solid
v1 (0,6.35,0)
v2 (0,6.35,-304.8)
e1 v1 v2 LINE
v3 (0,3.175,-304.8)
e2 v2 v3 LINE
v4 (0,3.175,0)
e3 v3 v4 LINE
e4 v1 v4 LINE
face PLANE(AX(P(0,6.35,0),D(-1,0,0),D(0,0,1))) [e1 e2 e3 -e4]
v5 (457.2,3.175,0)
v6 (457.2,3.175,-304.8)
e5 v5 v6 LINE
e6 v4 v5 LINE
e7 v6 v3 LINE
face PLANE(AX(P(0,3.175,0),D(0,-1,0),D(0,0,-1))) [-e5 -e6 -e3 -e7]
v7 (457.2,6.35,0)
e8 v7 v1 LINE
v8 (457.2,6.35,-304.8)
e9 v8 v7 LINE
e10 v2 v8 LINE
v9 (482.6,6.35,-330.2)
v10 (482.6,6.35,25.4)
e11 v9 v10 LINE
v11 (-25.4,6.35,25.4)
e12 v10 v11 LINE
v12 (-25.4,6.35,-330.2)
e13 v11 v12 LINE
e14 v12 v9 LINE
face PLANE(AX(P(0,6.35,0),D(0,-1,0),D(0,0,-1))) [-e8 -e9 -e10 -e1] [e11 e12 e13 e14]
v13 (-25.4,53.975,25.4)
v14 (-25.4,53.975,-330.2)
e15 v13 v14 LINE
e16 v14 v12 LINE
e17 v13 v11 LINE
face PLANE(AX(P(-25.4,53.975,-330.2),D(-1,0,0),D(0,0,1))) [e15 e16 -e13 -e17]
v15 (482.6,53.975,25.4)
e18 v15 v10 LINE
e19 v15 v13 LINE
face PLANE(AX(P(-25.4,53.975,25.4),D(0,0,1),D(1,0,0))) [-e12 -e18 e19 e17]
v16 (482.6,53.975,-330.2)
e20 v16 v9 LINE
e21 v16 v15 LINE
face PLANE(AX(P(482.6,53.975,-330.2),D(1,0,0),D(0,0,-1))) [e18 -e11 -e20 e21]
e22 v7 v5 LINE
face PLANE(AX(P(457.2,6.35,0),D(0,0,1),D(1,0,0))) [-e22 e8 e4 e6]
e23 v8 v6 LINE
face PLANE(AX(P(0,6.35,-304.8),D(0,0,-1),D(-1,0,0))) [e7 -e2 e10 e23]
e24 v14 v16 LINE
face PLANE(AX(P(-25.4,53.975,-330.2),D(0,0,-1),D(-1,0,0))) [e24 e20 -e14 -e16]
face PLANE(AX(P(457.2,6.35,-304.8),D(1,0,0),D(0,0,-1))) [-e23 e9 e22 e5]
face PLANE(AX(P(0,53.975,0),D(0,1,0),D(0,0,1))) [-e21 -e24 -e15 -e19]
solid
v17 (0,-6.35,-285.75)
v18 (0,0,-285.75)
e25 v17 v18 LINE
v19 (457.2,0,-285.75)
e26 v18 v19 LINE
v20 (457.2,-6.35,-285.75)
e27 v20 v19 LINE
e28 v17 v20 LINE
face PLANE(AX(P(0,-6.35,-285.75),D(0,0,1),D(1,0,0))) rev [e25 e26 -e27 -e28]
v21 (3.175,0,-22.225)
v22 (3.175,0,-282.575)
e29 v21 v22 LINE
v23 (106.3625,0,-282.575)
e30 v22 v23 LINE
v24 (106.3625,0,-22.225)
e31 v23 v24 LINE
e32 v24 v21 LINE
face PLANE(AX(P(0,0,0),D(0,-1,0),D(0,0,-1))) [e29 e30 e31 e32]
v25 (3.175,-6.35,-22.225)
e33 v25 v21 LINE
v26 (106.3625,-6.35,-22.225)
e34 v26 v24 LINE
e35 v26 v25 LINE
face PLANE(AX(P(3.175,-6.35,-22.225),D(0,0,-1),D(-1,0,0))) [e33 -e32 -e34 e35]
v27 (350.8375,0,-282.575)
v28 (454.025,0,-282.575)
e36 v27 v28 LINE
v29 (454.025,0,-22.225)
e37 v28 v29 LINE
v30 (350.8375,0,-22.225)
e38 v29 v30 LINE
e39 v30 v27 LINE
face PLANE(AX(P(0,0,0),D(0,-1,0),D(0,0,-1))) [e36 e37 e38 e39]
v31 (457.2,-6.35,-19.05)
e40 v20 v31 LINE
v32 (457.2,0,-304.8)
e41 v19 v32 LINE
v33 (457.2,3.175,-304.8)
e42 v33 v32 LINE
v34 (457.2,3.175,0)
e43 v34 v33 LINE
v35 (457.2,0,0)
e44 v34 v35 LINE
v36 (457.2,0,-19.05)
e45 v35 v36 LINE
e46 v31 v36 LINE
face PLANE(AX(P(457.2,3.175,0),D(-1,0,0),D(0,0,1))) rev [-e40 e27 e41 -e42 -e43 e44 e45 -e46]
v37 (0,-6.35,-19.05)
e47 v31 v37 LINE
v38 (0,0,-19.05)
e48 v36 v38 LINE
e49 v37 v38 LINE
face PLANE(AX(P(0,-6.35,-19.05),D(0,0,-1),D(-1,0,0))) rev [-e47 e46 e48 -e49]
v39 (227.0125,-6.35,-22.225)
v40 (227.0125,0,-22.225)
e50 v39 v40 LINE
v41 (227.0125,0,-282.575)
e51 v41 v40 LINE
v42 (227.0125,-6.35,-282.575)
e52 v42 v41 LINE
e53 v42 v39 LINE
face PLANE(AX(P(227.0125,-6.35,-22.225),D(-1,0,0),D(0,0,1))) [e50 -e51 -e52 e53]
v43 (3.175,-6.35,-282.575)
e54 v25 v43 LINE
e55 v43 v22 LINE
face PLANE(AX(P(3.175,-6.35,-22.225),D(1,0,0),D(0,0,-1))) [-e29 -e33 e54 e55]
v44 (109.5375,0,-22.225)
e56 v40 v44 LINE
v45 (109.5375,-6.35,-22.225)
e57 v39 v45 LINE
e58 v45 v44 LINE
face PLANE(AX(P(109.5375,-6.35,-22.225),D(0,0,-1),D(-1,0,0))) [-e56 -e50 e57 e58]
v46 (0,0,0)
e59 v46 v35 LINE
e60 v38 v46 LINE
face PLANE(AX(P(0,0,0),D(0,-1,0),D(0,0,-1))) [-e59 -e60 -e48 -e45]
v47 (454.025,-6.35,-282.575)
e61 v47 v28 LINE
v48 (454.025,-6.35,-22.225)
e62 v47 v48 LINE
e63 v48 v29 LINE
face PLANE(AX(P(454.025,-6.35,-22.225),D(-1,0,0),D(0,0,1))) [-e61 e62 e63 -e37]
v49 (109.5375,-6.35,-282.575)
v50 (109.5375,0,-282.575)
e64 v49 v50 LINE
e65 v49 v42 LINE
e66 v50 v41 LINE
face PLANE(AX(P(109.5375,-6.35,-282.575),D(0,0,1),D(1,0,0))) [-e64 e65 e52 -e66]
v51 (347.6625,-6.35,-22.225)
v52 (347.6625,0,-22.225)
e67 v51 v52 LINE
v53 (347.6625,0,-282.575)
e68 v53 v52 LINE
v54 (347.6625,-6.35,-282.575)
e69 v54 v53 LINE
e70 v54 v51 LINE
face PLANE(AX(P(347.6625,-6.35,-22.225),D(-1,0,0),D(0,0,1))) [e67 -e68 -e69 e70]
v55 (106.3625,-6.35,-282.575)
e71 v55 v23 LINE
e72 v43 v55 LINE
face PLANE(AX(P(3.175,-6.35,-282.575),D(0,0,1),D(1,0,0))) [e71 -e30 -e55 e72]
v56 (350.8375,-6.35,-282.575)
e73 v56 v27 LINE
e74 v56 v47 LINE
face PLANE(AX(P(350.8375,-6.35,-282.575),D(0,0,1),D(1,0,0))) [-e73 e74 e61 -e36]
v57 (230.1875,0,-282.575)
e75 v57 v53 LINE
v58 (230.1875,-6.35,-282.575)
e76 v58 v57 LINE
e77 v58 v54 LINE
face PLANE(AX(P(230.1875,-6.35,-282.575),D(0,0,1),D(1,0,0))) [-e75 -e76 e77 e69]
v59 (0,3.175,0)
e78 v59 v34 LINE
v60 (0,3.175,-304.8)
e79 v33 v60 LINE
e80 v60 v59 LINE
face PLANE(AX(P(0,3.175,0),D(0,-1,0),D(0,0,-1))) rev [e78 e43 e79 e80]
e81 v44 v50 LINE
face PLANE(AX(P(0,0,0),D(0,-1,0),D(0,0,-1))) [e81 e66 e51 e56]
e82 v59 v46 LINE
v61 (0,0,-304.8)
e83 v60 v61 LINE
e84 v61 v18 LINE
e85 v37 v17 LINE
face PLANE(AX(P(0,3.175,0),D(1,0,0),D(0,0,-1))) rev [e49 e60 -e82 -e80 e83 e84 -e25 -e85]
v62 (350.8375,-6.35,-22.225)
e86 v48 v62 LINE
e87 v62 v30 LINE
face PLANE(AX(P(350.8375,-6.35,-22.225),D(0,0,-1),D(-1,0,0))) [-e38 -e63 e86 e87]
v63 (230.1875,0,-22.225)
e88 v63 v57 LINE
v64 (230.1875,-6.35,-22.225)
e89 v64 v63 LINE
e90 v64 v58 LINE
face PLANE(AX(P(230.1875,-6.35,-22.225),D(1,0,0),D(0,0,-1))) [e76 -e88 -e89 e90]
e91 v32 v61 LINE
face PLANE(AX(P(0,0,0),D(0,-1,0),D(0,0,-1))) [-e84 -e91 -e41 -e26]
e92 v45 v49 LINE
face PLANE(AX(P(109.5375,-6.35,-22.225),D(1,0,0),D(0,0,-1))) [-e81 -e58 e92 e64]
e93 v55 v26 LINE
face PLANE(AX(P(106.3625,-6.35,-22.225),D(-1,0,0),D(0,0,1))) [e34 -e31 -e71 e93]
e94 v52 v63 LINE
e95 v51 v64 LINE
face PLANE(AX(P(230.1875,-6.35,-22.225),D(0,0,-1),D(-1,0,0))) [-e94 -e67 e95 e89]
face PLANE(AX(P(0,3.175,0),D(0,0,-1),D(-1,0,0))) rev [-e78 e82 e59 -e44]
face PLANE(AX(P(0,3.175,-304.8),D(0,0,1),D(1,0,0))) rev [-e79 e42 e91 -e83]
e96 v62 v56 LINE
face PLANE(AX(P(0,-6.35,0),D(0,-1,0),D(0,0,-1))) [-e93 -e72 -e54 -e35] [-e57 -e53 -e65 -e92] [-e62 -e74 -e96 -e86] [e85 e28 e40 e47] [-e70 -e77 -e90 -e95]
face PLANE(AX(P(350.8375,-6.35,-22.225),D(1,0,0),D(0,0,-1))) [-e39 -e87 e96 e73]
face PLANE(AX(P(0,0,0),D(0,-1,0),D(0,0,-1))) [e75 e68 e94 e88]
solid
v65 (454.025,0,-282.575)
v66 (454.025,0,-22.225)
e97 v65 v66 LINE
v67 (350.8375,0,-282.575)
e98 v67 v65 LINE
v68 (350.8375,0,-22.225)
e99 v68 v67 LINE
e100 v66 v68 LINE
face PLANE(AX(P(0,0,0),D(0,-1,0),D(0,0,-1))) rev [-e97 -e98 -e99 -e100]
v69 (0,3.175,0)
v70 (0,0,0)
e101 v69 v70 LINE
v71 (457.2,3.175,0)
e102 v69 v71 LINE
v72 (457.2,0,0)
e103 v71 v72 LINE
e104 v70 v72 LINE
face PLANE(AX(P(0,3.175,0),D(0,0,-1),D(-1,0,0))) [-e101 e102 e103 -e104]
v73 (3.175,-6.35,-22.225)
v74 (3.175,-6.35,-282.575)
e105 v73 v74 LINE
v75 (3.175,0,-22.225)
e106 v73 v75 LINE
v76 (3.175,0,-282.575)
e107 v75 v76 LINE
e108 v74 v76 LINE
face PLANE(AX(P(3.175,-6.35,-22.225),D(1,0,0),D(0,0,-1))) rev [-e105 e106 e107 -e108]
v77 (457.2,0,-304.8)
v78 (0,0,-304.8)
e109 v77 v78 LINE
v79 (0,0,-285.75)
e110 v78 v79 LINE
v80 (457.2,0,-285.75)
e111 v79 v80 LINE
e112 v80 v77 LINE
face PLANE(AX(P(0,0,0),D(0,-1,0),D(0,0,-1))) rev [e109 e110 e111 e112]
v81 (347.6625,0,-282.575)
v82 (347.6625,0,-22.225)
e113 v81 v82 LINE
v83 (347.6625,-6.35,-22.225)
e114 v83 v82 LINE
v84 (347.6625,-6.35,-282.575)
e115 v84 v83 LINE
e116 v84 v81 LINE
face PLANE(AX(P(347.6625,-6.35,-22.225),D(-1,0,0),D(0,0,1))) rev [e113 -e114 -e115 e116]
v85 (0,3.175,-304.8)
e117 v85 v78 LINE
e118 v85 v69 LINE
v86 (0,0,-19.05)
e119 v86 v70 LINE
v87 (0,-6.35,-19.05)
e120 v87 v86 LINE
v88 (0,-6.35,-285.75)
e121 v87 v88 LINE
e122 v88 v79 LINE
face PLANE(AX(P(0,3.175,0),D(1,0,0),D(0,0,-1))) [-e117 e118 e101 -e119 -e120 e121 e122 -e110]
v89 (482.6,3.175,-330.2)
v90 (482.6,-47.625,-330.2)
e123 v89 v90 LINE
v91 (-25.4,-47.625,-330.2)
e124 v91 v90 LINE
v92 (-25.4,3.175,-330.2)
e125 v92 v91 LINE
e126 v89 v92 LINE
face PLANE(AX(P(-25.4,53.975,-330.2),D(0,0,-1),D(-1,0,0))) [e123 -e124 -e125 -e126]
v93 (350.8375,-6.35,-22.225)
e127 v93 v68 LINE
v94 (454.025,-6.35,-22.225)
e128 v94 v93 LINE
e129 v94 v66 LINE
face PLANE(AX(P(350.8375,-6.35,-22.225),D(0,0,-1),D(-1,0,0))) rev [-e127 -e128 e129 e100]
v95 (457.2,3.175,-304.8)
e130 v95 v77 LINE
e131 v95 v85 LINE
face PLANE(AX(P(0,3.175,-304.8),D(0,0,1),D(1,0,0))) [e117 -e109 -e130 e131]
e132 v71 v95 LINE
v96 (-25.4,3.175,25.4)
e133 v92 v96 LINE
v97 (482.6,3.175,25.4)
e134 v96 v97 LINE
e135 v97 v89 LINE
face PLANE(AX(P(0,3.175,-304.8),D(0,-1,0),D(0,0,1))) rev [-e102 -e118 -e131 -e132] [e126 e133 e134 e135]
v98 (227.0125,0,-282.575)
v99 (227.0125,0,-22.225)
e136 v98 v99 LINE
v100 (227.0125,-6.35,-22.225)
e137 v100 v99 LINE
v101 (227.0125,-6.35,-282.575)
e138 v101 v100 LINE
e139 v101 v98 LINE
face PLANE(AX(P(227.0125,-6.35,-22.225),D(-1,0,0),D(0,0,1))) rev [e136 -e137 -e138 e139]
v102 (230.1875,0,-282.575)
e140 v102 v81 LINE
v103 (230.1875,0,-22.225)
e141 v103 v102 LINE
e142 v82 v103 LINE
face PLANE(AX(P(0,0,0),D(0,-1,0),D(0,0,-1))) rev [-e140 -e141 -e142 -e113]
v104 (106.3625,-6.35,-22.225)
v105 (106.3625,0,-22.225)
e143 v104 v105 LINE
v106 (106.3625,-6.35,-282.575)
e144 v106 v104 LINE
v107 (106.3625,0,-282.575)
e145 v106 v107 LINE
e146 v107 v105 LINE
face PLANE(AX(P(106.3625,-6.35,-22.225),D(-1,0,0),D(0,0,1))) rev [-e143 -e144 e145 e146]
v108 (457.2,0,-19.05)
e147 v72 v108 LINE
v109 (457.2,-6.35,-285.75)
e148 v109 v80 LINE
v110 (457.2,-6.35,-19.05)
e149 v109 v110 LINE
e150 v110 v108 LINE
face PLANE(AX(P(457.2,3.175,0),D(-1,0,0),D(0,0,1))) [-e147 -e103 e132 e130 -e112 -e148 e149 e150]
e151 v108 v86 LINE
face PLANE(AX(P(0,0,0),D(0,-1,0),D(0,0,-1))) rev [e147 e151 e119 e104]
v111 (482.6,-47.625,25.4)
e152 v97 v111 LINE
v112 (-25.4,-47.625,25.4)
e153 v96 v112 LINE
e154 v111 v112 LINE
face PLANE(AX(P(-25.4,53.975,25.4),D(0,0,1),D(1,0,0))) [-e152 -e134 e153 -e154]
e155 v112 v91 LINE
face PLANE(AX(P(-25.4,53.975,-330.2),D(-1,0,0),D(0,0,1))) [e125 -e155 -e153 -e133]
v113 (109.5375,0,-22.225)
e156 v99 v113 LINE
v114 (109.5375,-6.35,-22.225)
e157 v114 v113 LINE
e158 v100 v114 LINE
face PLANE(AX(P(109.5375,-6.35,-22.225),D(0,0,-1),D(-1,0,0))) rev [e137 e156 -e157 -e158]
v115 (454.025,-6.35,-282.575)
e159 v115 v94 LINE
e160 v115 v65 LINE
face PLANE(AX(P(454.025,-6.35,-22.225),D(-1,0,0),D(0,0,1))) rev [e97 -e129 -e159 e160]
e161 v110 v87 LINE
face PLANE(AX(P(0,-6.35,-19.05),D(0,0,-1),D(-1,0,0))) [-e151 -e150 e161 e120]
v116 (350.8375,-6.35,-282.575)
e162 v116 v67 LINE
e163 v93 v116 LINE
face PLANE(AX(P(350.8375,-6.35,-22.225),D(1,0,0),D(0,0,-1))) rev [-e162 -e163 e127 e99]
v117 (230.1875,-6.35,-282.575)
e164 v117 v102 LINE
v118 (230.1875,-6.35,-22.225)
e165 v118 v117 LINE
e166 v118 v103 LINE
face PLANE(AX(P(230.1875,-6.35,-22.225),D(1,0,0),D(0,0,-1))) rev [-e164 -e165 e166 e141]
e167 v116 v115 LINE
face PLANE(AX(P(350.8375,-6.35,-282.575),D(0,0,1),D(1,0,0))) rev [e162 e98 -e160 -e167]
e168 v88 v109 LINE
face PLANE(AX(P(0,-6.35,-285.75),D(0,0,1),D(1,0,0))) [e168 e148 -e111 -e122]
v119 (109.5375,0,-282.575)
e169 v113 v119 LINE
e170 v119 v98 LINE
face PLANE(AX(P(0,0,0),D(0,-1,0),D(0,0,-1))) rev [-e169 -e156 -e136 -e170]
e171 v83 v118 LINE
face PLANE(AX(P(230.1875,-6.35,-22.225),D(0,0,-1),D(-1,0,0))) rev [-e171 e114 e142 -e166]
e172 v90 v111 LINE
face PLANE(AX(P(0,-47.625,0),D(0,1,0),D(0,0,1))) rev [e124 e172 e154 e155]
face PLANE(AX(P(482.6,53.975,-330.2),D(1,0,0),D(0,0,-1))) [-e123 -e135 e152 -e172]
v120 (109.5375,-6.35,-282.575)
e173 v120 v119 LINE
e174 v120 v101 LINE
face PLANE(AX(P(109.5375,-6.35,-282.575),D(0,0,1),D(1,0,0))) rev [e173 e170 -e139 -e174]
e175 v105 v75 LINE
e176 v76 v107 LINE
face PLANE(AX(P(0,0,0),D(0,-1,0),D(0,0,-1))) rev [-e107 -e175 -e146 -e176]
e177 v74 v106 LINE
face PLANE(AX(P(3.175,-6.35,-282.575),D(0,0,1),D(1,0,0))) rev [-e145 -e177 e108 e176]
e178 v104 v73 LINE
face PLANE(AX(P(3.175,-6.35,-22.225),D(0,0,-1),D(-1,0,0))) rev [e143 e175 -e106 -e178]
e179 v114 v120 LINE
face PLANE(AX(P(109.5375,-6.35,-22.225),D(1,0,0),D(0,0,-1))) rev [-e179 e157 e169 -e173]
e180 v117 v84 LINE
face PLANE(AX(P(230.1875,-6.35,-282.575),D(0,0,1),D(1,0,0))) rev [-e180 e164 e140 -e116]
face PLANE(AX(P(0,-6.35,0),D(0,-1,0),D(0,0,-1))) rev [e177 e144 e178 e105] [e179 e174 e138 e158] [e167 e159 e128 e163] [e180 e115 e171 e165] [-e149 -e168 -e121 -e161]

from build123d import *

# Parameters (mm, degrees)
SKETCH1_W                  = 457.2
SKETCH1_H                  = 304.8
BOSS_EXTRUDE1_DEPTH        = 3.175
SKETCH2_W                  = 457.2
SKETCH2_H                  = 266.7
SKETCH2_W_2                = 117.475
SKETCH2_H_2                = 260.35
SKETCH2_W_3                = 103.1875
BOSS_EXTRUDE2_DEPTH        = 6.35
TOOLING_START              = 3.175
TOOLING_SPLIT1_OUTLINE_W   = 508
TOOLING_SPLIT1_OUTLINE_H   = 355.6
TOOLING_SPLIT1_DEPTH       = 50.8
TOOLING_START_2            = -25.4
TOOLING_SPLIT1_2_DEPTH     = 508
TOOLING_START_3            = 109.5375
TOOLING_SPLIT1_3_OUTLINE_W = 6.35
TOOLING_SPLIT1_3_OUTLINE_H = 260.35
TOOLING_SPLIT1_3_DEPTH     = 117.475
TOOLING_START_4            = 230.1875
TOOLING_SPLIT1_4_OUTLINE_W = 6.35
TOOLING_SPLIT1_4_OUTLINE_H = 260.35
TOOLING_SPLIT1_4_DEPTH     = 117.475
TOOLING_SPLIT1_5_OUTLINE_W = 6.35
TOOLING_SPLIT1_5_OUTLINE_H = 260.35
TOOLING_SPLIT1_5_DEPTH     = 103.1875
TOOLING_START_5            = 350.8375
TOOLING_SPLIT1_6_OUTLINE_W = 6.35
TOOLING_SPLIT1_6_OUTLINE_H = 260.35
TOOLING_SPLIT1_6_DEPTH     = 103.1875
TOOLING_SPLIT1_7_DEPTH     = 25.4
TOOLING_START_6            = 457.2
TOOLING_SPLIT1_8_DEPTH     = 25.4
SKETCH6_W                  = 508
SKETCH6_H                  = 355.6
SKETCH6_W_2                = 457.2
SKETCH6_H_2                = 304.8
CUT_EXTRUDE1_DEPTH         = 3.175


# Read off the part's stored shape, not the designer's step: Tooling Split1
with BuildPart() as part:
    # Sketch1 → Boss-Extrude1 (new body)
    with BuildSketch(Plane(origin=(0, 0, 0), x_dir=(1, 0, 0), z_dir=(0, 1, 0))):
        with Locations((228.6, 152.4)):
            Rectangle(SKETCH1_W, SKETCH1_H)
    extrude(amount=BOSS_EXTRUDE1_DEPTH)

    # Sketch2 → Boss-Extrude2 (add)
    with BuildSketch(Plane.XZ):
        with Locations((228.6, -152.4)):
            Rectangle(SKETCH2_W, SKETCH2_H)
        with Locations((168.275, -152.4)):
            Rectangle(SKETCH2_W_2, SKETCH2_H_2, mode=Mode.SUBTRACT)
        with Locations((54.76875, -152.4)):
            Rectangle(SKETCH2_W_3, SKETCH2_H_2, mode=Mode.SUBTRACT)
        with Locations((402.43125, -152.4)):
            Rectangle(SKETCH2_W_3, SKETCH2_H_2, mode=Mode.SUBTRACT)
        with Locations((288.925, -152.4)):
            Rectangle(SKETCH2_W_2, SKETCH2_H_2, mode=Mode.SUBTRACT)
    extrude(amount=BOSS_EXTRUDE2_DEPTH)


with BuildPart() as body_2:
    # Tooling Split1 outline → Tooling Split1 (new body)
    with BuildSketch(Plane(origin=(0, 0, 0), x_dir=(1, 0, 0), z_dir=(0, 1, 0)).offset(TOOLING_START)):
        with Locations((228.6, 152.4)):
            Rectangle(TOOLING_SPLIT1_OUTLINE_W, TOOLING_SPLIT1_OUTLINE_H)
    extrude(amount=TOOLING_SPLIT1_DEPTH)

    # Sketch6 → Cut-Extrude1 (cut)
    with BuildSketch(Plane.XZ.offset(-3.175)):
        with Locations((228.6, -152.4)):
            Rectangle(SKETCH6_W, SKETCH6_H)
        with Locations((228.6, -152.4)):
            Rectangle(SKETCH6_W_2, SKETCH6_H_2, mode=Mode.SUBTRACT)
    extrude(amount=-CUT_EXTRUDE1_DEPTH, mode=Mode.SUBTRACT)


with BuildPart() as body_3:
    # Tooling Split1 2 outline → Tooling Split1 2 (new body)
    with BuildSketch(Plane.YZ.offset(TOOLING_START_2)):
        Polygon((3.175, 0), (3.175, 25.4), (-47.625, 25.4), (-47.625, -330.2), (3.175, -330.2), (3.175, -304.8), (0, -304.8), (0, -285.75), (-6.35, -285.75), (-6.35, -19.05), (0, -19.05), (0, 0), align=None)
    extrude(amount=TOOLING_SPLIT1_2_DEPTH)

    # Tooling Split1 3 outline → Tooling Split1 3 (add)
    with BuildSketch(Plane.YZ.offset(TOOLING_START_3)):
        with Locations((-3.175, -152.4)):
            Rectangle(TOOLING_SPLIT1_3_OUTLINE_W, TOOLING_SPLIT1_3_OUTLINE_H)
    extrude(amount=TOOLING_SPLIT1_3_DEPTH)

    # Tooling Split1 4 outline → Tooling Split1 4 (add)
    with BuildSketch(Plane.YZ.offset(TOOLING_START_4)):
        with Locations((-3.175, -152.4)):
            Rectangle(TOOLING_SPLIT1_4_OUTLINE_W, TOOLING_SPLIT1_4_OUTLINE_H)
    extrude(amount=TOOLING_SPLIT1_4_DEPTH)

    # Tooling Split1 5 outline → Tooling Split1 5 (add)
    with BuildSketch(Plane.YZ.offset(TOOLING_START)):
        with Locations((-3.175, -152.4)):
            Rectangle(TOOLING_SPLIT1_5_OUTLINE_W, TOOLING_SPLIT1_5_OUTLINE_H)
    extrude(amount=TOOLING_SPLIT1_5_DEPTH)

    # Tooling Split1 6 outline → Tooling Split1 6 (add)
    with BuildSketch(Plane.YZ.offset(TOOLING_START_5)):
        with Locations((-3.175, -152.4)):
            Rectangle(TOOLING_SPLIT1_6_OUTLINE_W, TOOLING_SPLIT1_6_OUTLINE_H)
    extrude(amount=TOOLING_SPLIT1_6_DEPTH)

    # Tooling Split1 7 outline → Tooling Split1 7 (add)
    with BuildSketch(Plane.YZ.offset(TOOLING_START_2)):
        Polygon((3.175, -304.8), (3.175, 0), (0, 0), (0, -19.05), (-6.35, -19.05), (-6.35, -285.75), (0, -285.75), (0, -304.8), align=None)
    extrude(amount=TOOLING_SPLIT1_7_DEPTH)

    # Tooling Split1 8 outline → Tooling Split1 8 (add)
    with BuildSketch(Plane.YZ.offset(TOOLING_START_6)):
        Polygon((3.175, -304.8), (3.175, 0), (0, 0), (0, -19.05), (-6.35, -19.05), (-6.35, -285.75), (0, -285.75), (0, -304.8), align=None)
    extrude(amount=TOOLING_SPLIT1_8_DEPTH)


solid = Compound([part.part, body_2.part, body_3.part])
